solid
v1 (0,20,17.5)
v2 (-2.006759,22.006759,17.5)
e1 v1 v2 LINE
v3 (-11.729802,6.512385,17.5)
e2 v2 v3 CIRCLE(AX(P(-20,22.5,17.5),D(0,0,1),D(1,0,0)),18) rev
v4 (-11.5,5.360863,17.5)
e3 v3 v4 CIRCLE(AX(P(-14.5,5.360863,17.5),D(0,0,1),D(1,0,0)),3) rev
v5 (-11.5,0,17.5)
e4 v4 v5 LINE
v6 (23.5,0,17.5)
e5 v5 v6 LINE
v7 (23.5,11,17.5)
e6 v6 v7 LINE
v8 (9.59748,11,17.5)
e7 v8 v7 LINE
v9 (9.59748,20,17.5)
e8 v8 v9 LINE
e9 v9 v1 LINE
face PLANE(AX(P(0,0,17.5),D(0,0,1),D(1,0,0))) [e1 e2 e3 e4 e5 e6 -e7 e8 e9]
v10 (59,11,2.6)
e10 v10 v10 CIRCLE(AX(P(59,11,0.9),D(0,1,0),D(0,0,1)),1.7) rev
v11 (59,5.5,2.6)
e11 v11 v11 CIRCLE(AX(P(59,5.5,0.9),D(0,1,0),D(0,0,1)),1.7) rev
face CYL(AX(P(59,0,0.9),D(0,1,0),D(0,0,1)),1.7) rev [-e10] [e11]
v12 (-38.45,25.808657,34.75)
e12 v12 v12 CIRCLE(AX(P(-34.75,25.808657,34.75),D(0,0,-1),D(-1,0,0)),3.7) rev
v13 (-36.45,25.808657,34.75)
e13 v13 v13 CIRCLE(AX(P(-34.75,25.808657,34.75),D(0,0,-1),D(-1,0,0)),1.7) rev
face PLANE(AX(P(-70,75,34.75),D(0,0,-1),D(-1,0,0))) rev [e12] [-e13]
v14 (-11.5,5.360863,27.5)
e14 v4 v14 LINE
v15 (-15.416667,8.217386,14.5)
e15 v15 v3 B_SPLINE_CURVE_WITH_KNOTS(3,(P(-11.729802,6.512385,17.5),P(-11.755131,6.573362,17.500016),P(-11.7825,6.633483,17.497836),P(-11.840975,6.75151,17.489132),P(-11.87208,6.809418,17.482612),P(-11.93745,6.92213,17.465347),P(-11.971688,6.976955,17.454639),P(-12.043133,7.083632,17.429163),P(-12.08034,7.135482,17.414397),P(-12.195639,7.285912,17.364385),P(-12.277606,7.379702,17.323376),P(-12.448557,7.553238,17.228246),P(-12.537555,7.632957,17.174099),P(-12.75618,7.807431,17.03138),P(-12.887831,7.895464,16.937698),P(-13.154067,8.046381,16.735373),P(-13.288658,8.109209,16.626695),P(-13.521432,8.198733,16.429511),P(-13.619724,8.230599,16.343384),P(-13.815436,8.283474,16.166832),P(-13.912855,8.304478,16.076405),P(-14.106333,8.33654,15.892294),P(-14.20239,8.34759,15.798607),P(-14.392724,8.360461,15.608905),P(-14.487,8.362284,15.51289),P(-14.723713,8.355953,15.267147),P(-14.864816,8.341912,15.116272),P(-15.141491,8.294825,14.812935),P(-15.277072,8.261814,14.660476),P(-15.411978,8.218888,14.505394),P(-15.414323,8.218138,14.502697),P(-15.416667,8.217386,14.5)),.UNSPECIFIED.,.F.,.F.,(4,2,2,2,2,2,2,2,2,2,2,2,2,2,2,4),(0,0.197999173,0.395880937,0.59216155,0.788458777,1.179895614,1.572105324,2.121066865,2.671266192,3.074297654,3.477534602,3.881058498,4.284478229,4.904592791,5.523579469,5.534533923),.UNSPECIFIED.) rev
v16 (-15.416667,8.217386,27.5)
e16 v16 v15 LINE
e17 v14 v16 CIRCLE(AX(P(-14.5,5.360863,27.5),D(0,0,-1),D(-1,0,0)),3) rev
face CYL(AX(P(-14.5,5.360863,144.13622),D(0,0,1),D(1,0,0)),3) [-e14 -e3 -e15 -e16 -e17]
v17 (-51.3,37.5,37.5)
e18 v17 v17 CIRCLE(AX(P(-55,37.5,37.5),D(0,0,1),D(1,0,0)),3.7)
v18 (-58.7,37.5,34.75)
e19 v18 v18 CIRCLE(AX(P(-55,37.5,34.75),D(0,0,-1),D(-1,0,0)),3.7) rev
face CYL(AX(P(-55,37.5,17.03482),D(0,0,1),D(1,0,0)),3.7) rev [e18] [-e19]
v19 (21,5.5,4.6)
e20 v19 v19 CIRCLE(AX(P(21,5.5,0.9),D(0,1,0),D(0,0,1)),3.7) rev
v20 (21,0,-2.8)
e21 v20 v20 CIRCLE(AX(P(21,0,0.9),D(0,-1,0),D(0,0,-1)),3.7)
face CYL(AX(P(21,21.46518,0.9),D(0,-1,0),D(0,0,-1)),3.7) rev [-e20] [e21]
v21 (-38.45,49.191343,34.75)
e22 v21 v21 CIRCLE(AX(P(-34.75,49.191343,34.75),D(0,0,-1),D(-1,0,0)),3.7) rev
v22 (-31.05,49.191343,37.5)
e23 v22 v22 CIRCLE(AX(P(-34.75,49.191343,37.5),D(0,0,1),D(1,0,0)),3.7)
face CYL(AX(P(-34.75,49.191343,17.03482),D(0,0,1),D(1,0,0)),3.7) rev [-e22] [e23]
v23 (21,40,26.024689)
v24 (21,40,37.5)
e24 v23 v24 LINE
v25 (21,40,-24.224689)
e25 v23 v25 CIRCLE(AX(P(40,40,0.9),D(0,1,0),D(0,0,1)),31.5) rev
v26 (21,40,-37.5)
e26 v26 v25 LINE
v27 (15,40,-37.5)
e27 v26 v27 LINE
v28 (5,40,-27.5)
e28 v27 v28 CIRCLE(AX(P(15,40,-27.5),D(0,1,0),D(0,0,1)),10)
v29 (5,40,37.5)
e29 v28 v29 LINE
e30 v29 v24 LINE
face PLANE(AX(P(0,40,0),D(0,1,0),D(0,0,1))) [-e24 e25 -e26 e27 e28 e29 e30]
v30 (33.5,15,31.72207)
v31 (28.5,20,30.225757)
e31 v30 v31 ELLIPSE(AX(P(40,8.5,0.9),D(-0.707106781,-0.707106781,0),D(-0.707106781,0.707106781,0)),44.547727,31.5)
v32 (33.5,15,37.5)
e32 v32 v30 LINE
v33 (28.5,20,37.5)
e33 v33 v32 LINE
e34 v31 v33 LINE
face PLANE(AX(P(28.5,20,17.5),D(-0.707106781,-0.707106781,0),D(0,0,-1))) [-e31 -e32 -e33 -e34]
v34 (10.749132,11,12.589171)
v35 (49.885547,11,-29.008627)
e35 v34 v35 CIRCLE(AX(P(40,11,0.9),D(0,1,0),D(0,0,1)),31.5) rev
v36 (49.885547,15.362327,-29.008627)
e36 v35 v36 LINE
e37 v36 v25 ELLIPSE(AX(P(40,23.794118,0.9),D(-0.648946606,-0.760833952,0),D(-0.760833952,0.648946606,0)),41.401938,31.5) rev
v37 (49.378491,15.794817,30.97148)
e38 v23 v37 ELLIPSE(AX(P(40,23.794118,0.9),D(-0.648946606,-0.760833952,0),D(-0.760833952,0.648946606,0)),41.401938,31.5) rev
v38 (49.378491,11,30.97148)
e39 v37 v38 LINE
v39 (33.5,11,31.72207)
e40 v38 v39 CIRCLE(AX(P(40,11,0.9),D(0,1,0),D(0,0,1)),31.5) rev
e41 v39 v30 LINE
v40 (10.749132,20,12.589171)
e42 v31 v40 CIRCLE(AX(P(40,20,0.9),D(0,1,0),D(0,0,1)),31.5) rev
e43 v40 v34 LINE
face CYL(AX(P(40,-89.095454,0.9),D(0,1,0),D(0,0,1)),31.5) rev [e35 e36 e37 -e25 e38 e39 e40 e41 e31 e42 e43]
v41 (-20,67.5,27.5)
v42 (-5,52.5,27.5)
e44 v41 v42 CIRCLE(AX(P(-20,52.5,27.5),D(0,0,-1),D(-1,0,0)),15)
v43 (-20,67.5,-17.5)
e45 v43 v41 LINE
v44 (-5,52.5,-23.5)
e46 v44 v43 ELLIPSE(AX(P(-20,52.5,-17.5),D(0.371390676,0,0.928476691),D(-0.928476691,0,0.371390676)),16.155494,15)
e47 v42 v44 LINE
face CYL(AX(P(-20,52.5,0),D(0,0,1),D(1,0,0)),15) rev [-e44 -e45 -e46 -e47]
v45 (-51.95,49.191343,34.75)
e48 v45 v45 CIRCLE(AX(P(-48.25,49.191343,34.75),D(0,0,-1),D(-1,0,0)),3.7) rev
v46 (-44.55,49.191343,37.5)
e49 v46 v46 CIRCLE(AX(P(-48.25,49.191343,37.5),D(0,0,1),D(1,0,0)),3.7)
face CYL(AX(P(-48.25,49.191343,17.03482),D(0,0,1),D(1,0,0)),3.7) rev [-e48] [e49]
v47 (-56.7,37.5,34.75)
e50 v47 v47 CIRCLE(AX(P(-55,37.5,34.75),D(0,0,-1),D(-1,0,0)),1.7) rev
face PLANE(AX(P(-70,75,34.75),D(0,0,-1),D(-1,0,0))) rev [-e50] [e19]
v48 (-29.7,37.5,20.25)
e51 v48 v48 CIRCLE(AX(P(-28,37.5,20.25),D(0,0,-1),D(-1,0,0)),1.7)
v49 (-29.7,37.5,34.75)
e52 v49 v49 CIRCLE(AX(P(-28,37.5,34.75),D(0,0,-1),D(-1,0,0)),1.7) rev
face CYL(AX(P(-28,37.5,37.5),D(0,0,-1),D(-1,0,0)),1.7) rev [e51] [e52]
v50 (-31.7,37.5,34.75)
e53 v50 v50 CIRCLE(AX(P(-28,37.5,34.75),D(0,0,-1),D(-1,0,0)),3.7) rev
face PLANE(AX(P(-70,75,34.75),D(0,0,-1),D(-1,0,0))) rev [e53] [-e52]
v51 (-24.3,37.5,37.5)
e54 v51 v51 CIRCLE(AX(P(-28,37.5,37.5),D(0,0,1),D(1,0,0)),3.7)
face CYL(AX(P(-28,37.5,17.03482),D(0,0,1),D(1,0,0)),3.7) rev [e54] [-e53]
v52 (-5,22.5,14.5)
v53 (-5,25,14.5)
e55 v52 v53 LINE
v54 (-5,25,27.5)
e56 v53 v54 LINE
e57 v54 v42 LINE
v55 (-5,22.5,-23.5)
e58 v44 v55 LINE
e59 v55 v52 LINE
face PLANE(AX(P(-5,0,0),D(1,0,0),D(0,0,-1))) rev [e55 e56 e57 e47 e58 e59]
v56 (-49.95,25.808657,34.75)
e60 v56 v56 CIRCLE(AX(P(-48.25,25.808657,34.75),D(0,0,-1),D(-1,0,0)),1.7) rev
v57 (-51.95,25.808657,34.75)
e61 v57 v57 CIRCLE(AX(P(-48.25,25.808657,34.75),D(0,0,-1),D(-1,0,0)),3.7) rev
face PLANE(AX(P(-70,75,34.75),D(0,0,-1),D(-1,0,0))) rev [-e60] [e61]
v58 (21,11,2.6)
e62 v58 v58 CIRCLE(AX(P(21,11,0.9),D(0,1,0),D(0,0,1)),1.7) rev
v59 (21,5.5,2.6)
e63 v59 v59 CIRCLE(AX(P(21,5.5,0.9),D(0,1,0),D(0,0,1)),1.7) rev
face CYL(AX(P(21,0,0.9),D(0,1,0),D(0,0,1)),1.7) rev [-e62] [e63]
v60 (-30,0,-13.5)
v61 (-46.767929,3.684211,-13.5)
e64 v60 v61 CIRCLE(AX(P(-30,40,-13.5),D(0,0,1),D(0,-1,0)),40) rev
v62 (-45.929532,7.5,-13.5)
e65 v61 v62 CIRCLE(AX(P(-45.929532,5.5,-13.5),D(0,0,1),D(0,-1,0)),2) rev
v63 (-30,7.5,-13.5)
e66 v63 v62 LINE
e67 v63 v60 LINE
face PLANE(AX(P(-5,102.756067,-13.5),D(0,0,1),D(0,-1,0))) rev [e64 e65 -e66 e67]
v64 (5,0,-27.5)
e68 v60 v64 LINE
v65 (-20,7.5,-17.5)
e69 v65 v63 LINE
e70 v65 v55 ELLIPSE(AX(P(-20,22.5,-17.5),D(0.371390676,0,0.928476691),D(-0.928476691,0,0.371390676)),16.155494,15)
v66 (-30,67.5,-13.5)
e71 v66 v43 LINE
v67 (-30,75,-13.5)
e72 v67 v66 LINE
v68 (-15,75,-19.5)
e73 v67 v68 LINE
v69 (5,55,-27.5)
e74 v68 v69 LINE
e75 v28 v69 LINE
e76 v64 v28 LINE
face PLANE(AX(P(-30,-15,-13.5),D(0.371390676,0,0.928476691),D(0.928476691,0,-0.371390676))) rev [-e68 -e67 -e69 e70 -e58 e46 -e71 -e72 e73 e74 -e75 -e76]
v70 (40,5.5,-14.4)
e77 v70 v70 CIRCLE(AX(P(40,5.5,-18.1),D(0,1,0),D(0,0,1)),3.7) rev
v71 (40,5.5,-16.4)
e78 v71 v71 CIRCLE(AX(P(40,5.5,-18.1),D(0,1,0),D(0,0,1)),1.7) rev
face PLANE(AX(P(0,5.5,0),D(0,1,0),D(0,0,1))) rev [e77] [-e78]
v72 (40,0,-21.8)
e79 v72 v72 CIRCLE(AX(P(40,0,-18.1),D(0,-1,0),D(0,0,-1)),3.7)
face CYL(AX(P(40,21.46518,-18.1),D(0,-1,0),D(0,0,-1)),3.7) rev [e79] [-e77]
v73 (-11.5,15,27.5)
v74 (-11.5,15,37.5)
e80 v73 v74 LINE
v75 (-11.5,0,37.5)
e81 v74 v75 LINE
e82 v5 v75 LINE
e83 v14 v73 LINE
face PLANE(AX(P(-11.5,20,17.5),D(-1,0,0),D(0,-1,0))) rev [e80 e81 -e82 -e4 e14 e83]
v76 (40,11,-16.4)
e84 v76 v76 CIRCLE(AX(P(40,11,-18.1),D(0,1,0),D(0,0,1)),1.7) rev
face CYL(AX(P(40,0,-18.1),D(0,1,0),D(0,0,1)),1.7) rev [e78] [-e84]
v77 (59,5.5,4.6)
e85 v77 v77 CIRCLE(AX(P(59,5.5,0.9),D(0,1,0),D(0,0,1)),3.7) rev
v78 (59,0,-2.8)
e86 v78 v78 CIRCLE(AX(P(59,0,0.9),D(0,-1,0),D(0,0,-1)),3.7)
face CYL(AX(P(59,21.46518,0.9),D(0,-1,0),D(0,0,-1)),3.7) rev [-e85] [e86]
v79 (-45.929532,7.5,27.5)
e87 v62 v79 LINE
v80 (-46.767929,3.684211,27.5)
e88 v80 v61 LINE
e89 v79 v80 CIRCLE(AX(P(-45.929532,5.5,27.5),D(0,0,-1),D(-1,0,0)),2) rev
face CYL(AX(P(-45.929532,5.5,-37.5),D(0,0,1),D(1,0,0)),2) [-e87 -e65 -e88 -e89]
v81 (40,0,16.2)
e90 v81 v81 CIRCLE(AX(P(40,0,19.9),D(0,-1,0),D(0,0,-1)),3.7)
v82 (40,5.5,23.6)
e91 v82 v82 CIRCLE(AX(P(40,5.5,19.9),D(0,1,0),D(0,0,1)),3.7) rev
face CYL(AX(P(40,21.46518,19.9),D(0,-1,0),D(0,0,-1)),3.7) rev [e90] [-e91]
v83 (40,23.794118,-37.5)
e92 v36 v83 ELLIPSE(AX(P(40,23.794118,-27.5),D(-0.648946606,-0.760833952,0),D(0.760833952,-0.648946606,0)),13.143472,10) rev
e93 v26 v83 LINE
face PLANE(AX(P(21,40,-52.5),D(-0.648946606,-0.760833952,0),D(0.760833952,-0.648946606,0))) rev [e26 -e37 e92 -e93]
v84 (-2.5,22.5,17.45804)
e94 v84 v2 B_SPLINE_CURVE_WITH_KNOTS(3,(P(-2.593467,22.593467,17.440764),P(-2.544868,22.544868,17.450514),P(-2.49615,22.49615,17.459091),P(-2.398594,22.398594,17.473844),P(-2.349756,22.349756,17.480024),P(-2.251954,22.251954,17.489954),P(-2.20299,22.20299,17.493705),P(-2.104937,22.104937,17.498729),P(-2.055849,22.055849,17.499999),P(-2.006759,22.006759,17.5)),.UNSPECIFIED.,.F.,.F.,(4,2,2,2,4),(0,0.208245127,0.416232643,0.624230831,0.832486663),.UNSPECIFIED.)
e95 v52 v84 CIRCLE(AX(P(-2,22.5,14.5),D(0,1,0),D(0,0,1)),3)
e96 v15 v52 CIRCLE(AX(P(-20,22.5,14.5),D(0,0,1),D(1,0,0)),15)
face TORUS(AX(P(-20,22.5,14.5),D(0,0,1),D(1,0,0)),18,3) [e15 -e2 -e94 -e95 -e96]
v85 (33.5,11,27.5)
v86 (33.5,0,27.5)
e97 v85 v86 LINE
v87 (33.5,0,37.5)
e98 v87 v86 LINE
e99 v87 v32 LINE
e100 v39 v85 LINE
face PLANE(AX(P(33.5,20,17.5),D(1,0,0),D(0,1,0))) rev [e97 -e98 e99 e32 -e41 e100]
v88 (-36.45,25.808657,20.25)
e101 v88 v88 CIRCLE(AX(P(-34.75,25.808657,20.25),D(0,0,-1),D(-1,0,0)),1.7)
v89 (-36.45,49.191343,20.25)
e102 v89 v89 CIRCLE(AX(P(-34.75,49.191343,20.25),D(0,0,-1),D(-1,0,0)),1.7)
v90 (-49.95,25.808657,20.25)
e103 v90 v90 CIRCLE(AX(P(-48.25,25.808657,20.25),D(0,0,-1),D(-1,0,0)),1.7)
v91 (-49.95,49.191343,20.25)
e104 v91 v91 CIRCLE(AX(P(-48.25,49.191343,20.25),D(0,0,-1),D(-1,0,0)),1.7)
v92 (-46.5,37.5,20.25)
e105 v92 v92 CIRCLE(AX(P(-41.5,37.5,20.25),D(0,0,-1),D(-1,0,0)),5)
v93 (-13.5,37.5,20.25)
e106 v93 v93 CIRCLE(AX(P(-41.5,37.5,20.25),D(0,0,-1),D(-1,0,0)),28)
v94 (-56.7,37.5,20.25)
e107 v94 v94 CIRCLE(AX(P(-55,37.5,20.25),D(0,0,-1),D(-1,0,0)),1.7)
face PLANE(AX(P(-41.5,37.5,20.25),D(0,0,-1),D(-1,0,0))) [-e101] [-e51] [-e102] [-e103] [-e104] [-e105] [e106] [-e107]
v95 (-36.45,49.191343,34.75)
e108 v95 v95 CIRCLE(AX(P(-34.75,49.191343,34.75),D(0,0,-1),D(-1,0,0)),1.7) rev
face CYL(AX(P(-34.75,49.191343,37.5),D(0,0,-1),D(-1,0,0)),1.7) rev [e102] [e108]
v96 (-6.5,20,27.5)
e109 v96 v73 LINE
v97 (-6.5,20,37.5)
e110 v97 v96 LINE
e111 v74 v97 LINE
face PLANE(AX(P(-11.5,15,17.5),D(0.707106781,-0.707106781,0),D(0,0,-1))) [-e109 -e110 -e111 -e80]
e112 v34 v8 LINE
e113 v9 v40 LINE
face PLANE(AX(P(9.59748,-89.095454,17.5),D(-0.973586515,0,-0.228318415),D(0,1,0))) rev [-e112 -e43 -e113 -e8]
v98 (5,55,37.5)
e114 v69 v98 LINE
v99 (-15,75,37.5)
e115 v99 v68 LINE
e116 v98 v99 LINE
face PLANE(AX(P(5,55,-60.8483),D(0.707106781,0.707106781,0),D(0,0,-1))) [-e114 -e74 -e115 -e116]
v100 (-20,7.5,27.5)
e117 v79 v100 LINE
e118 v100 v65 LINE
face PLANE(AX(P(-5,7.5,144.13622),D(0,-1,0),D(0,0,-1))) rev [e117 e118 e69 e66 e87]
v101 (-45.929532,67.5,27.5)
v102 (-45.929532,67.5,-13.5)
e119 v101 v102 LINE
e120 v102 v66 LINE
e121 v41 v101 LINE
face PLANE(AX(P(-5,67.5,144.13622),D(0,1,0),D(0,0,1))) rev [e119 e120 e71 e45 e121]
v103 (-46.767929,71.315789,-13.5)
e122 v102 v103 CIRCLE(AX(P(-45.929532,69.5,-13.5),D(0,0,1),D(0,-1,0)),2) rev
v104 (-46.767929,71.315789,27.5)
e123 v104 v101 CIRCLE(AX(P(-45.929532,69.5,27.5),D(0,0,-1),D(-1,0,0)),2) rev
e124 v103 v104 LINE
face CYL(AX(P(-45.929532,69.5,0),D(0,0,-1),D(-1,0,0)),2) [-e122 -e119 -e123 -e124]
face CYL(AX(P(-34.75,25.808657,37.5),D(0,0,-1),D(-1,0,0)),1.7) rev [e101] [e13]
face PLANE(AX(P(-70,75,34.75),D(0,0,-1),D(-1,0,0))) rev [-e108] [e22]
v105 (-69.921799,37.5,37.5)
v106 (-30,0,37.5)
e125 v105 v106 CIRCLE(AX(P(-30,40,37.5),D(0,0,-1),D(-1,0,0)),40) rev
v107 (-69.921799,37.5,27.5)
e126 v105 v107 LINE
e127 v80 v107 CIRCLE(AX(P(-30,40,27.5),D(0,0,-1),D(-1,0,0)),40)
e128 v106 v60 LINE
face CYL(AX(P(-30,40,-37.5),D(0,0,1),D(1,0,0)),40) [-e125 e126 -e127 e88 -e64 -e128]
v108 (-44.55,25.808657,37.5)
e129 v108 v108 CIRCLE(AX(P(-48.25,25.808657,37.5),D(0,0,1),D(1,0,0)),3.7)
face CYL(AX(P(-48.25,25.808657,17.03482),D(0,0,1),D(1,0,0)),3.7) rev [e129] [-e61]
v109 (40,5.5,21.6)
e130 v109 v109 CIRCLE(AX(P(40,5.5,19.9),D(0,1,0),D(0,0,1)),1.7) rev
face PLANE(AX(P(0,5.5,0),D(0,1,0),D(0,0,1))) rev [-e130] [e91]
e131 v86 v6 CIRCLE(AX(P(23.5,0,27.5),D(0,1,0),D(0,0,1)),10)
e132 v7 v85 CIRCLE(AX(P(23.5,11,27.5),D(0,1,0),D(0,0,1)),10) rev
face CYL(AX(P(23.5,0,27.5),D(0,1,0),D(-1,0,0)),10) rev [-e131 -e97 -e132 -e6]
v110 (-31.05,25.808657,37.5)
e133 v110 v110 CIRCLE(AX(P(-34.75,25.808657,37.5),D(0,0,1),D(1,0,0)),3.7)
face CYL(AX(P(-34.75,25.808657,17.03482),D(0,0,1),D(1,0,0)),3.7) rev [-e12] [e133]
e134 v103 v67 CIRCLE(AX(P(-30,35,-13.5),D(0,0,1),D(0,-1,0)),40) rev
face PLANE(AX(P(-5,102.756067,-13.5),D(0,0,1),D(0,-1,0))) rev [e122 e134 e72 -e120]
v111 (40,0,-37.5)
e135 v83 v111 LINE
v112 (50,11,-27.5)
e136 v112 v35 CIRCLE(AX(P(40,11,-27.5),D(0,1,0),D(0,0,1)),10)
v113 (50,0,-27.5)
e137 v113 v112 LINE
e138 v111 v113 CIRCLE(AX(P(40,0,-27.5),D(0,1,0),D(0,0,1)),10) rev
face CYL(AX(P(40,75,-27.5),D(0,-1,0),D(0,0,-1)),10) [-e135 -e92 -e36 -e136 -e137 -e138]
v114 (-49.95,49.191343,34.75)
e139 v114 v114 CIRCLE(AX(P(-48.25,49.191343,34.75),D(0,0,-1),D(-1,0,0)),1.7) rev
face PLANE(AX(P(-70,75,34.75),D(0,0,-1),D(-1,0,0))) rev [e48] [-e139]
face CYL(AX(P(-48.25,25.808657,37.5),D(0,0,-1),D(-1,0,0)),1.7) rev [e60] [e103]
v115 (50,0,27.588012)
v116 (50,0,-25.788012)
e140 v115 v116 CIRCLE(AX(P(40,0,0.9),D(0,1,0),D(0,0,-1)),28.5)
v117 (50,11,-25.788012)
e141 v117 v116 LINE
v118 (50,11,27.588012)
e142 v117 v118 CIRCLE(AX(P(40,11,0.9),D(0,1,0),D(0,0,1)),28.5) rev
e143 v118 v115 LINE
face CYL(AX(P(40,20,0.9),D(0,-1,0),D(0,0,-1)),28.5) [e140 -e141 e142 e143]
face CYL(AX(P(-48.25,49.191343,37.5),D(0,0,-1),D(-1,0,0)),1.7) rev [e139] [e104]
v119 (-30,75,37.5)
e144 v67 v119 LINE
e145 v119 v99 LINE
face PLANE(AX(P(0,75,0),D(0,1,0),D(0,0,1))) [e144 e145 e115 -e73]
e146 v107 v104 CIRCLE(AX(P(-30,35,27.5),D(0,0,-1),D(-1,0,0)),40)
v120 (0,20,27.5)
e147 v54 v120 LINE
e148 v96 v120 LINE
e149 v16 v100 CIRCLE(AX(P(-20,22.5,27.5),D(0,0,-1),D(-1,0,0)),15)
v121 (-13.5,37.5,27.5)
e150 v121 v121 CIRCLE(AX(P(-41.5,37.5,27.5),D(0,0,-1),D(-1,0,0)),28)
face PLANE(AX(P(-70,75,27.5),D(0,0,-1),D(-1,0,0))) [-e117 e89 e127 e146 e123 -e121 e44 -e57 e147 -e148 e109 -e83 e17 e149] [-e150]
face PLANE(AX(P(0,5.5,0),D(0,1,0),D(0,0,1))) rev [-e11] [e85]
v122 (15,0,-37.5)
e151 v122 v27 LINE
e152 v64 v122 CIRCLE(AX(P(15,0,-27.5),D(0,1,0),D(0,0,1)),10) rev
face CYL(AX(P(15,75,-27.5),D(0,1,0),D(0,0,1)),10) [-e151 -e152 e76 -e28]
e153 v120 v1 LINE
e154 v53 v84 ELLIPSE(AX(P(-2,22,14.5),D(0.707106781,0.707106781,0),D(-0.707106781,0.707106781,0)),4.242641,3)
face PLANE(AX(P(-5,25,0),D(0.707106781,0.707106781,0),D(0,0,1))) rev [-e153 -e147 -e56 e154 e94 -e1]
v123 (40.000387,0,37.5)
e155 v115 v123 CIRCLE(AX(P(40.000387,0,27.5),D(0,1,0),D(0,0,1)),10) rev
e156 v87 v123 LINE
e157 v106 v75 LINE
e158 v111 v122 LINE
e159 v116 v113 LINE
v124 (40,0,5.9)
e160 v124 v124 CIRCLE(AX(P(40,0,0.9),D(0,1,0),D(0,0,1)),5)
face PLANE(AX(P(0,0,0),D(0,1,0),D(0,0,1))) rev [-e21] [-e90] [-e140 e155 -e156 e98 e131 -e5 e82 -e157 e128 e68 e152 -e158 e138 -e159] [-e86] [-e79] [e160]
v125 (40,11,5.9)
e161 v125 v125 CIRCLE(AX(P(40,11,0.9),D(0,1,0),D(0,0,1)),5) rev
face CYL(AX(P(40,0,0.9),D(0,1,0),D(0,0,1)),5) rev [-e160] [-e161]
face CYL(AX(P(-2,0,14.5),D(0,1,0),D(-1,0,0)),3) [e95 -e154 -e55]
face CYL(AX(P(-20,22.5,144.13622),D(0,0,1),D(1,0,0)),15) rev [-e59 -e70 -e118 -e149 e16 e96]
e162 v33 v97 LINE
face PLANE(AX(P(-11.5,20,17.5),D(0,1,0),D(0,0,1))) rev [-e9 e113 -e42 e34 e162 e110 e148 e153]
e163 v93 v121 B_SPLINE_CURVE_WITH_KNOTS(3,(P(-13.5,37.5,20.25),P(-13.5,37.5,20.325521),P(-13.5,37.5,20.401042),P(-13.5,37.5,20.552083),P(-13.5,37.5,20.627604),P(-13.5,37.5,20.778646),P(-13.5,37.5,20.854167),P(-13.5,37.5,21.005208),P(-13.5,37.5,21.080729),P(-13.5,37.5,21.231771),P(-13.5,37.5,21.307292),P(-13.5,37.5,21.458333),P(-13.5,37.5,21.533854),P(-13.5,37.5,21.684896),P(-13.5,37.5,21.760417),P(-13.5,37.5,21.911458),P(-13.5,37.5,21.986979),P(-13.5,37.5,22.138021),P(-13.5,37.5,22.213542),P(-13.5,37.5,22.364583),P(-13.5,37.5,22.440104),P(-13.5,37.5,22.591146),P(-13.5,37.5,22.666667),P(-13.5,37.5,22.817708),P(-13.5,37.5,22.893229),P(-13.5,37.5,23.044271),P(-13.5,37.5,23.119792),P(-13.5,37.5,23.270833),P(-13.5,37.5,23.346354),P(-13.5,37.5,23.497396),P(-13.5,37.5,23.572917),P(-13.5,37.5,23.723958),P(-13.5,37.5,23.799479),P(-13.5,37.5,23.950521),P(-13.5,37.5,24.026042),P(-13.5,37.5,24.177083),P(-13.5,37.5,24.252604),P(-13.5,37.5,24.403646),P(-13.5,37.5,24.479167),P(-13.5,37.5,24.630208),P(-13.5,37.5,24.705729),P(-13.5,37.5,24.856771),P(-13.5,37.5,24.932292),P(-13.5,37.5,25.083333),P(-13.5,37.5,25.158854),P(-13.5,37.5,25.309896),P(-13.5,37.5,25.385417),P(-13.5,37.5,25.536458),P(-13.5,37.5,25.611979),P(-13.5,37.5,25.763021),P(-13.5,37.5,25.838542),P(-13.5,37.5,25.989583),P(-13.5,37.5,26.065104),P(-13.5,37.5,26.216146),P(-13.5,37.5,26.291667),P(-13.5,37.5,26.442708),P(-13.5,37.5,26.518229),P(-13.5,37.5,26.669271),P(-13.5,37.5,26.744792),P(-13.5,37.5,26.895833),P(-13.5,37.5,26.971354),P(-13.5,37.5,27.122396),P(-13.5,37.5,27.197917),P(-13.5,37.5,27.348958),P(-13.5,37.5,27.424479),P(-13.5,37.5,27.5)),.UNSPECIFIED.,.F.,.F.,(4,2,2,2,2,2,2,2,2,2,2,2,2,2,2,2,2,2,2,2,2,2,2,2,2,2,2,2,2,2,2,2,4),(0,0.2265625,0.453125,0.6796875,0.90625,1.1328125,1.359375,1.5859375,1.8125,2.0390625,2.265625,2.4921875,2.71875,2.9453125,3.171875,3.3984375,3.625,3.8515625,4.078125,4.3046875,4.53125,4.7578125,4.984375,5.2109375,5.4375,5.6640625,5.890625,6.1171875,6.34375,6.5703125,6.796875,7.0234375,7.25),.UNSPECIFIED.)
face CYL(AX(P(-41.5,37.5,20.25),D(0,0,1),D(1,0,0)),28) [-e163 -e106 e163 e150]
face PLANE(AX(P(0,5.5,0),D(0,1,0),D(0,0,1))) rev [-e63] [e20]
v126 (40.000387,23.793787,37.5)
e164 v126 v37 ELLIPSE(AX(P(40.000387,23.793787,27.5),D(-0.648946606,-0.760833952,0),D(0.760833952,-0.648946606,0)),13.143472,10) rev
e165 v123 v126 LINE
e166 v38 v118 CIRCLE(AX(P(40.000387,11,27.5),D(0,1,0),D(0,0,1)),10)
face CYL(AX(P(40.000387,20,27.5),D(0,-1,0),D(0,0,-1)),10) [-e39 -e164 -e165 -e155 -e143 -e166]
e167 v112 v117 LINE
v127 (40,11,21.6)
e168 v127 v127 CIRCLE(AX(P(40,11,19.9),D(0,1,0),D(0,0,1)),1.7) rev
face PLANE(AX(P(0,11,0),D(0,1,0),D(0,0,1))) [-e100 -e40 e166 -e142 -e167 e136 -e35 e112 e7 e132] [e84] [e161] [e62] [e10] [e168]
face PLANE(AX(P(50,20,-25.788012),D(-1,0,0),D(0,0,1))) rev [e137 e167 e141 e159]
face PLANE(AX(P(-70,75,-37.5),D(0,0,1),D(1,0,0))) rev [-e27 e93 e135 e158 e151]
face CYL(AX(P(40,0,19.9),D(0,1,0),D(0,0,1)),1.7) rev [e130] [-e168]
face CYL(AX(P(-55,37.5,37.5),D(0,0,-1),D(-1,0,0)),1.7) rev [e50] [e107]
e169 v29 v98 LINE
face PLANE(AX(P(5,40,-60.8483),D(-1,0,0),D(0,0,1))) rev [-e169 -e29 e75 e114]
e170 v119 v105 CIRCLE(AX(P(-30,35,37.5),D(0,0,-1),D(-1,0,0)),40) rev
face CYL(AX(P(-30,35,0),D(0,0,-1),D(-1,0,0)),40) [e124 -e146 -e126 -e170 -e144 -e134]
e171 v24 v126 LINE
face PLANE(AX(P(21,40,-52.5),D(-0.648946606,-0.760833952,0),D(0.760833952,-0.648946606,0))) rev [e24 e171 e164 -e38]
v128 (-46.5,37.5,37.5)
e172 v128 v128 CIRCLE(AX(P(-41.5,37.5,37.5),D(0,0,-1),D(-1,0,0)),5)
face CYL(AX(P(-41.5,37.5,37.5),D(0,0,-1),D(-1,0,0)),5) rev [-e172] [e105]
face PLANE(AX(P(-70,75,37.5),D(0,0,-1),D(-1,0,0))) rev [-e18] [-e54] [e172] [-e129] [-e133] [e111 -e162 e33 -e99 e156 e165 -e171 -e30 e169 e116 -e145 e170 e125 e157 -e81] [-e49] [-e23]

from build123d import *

# Parameters (mm, degrees)
SKETCH_1_W           = 140
SKETCH_1_H           = 75
EXTRUDE_1_DEPTH      = 75
SKETCH_2_R           = 5
SKETCH_2_R_2         = 1.7
CUT_EXTRUDE_3_DEPTH  = 75
SKETCH_3_R           = 30
CUT_EXTRUDE_4_DEPTH  = 65
SKETCH_5_W           = 86.110755756
SKETCH_5_H           = 127.816531237
CUT_EXTRUDE_5_DEPTH  = 65
SKETCH_6_R           = 5
SKETCH_6_R_2         = 1.7
CUT_EXTRUDE_6_DEPTH  = 110.230261375
SKETCH_7_R           = 31.5
CUT_EXTRUDE_8_DEPTH  = 64
SKETCH_8_W           = 81.607165619
SKETCH_8_H           = 101.959181743
CUT_EXTRUDE_9_DEPTH  = 35
SKETCH_9_W           = 88.154882568
SKETCH_9_H           = 60
CUT_EXTRUDE_10_DEPTH = 41
SKETCH_10_W          = 45
SKETCH_10_H          = 50
CUT_EXTRUDE_11_DEPTH = 20
FILLET_2_R           = 10
SKETCH_12_W          = 15
SKETCH_12_H          = 75
CUT_EXTRUDE_13_DEPTH = 29
CUT_EXTRUDE_14_DEPTH = 90
CUT_EXTRUDE_15_DEPTH = 20
CHAMFER_1_SIZE       = 5
CHAMFER_2_SIZE       = 5
CHAMFER_3_SIZE       = 3.631453243
CHAMFER_4_SIZE       = 25
CUT_EXTRUDE_16_DEPTH = 90
FILLET_4_R           = 40
FILLET_9_R           = 10
CUT_EXTRUDE_17_DEPTH = 90
FILLET_10_R          = 10
FILLET_11_R          = 2
FILLET_12_R          = 15
CHAMFER_5_SIZE       = 20
FILLET_13_R          = 3
SKETCH_20_R          = 3.7
CUT_EXTRUDE_18_DEPTH = 2.75
SKETCH_21_R          = 3.7
CUT_EXTRUDE_19_DEPTH = 5.5
EXTRUDE_START        = 7.25
SKETCH_22_R          = 28
SKETCH_22_R_2        = 5
SKETCH_22_R_3        = 1.7
EXTRUDE_2_DEPTH      = 7.25


# Some blends are built 0.0001 mm under size
with BuildPart() as part:
    # 草图1 → 凸台-拉伸1 (new body)
    with BuildSketch(Plane(origin=(0, 0, 0), x_dir=(1, 0, 0), z_dir=(0, 1, 0))):
        Rectangle(SKETCH_1_W, SKETCH_1_H)
    extrude(amount=EXTRUDE_1_DEPTH)

    # 草图2 → 切除-拉伸3 (cut)
    with BuildSketch(Plane(origin=(0, 0, -37.5), x_dir=(-1, 0, 0), z_dir=(0, 0, -1))):
        with Locations((41.5, 37.5)):
            Circle(SKETCH_2_R)
        with Locations((55, 37.5)):
            Circle(SKETCH_2_R_2)
        with Locations((48.25, 25.808657049)):
            Circle(SKETCH_2_R_2)
        with Locations((34.75, 25.808657049)):
            Circle(SKETCH_2_R_2)
        with Locations((28, 37.5)):
            Circle(SKETCH_2_R_2)
        with Locations((34.75, 49.191342951)):
            Circle(SKETCH_2_R_2)
        with Locations((48.25, 49.191342951)):
            Circle(SKETCH_2_R_2)
    extrude(amount=-CUT_EXTRUDE_3_DEPTH, mode=Mode.SUBTRACT)

    # 草图3 → 切除-拉伸4 (cut)
    with BuildSketch(Plane(origin=(0, 0, -37.5), x_dir=(-1, 0, 0), z_dir=(0, 0, -1))):
        with Locations((41.5, 37.5)):
            Circle(SKETCH_3_R)
    extrude(amount=-CUT_EXTRUDE_4_DEPTH, mode=Mode.SUBTRACT)

    # 草图5 → 切除-拉伸5 (cut)
    with BuildSketch(Plane.ZY.offset(70)):
        with Locations((-56.555377878, 38.847801736)):
            Rectangle(SKETCH_5_W, SKETCH_5_H)
    extrude(amount=-CUT_EXTRUDE_5_DEPTH, mode=Mode.SUBTRACT)

    # 草图6 → 切除-拉伸6 (cut, through all)
    with BuildSketch(Plane(origin=(0, 75, 0), x_dir=(1, 0, 0), z_dir=(0, 1, 0))):
        with Locations(Location((40, -0.9, 0), (0, 0, 270))):
            Circle(SKETCH_6_R)
        with Locations(Location((59, -0.9, 0), (0, 0, 270))):
            Circle(SKETCH_6_R_2)
        with Locations(Location((40, -19.9, 0), (0, 0, 270))):
            Circle(SKETCH_6_R_2)
        with Locations(Location((21, -0.9, 0), (0, 0, 270))):
            Circle(SKETCH_6_R_2)
        with Locations(Location((40, 18.1, 0), (0, 0, 270))):
            Circle(SKETCH_6_R_2)
    extrude(amount=-CUT_EXTRUDE_6_DEPTH, mode=Mode.SUBTRACT)

    # 草图7 → 切除-拉伸8 (cut)
    with BuildSketch(Plane(origin=(0, 75, 0), x_dir=(1, 0, 0), z_dir=(0, 1, 0))):
        with Locations((40, -0.9)):
            Circle(SKETCH_7_R)
    extrude(amount=-CUT_EXTRUDE_8_DEPTH, mode=Mode.SUBTRACT)

    # 草图8 → 切除-拉伸9 (cut)
    with BuildSketch(Plane(origin=(0, 75, 0), x_dir=(1, 0, 0), z_dir=(0, 1, 0))):
        with Locations((45.803582809, 9.868709537)):
            Rectangle(SKETCH_8_W, SKETCH_8_H)
    extrude(amount=-CUT_EXTRUDE_9_DEPTH, mode=Mode.SUBTRACT)

    # 草图9 → 切除-拉伸10 (cut)
    with BuildSketch(Plane(origin=(0, 0, -13.5), x_dir=(-1, 0, 0), z_dir=(0, 0, -1))):
        with Locations((49.077441284, 37.5)):
            Rectangle(SKETCH_9_W, SKETCH_9_H)
    extrude(amount=-CUT_EXTRUDE_10_DEPTH, mode=Mode.SUBTRACT)

    # 草图10 → 切除-拉伸11 (cut)
    with BuildSketch(Plane.XY.offset(37.5)):
        with Locations((11, -5)):
            Rectangle(SKETCH_10_W, SKETCH_10_H)
    extrude(amount=-CUT_EXTRUDE_11_DEPTH, mode=Mode.SUBTRACT)

    # 圆角2
    fillet_2_edges = [part.edges().sort_by_distance(p)[0] for p in [
        (33.5, 5.5, 17.5),
    ]]
    fillet(fillet_2_edges, radius=FILLET_2_R)

    # 草图12 → 切除-拉伸13 (cut)
    with BuildSketch(Plane(origin=(0, 40, 0), x_dir=(1, 0, 0), z_dir=(0, 1, 0))):
        with Locations((62.5, 0)):
            Rectangle(SKETCH_12_W, SKETCH_12_H)
    extrude(amount=-CUT_EXTRUDE_13_DEPTH, mode=Mode.SUBTRACT)

    # 草图13 → 切除-拉伸14 (cut)
    with BuildSketch(Plane.XY.offset(37.5)):
        Polygon((21, 40), (55, 11), (55, 40), align=None)
    extrude(amount=-CUT_EXTRUDE_14_DEPTH, mode=Mode.SUBTRACT)

    # 草图14 → 切除-拉伸15 (cut)
    with BuildSketch(Plane.XZ):
        with BuildLine():
            Line((50, -25.78801229), (50, -49.043195076))
            Line((50, -49.043195076), (107.000534674, -49.043195076))
            Line((107.000534674, -49.043195076), (107.000534674, 45.470511991))
            Line((107.000534674, 45.470511991), (50, 45.470511991))
            Line((50, 45.470511991), (50, 27.58801229))
            ThreePointArc((50, 27.58801229), (68.5, 0.9), (50, -25.78801229))
        make_face()
    extrude(amount=-CUT_EXTRUDE_15_DEPTH, mode=Mode.SUBTRACT)

    # 倒角1
    chamfer_1_edges = [part.edges().sort_by_distance(p)[0] for p in [
        (-11.5, 20, 32.5),
        (33.5, 20, 34.611035007),
    ]]
    chamfer(chamfer_1_edges, length=CHAMFER_1_SIZE)

    # 倒角2
    chamfer_2_edges = [part.edges().sort_by_distance(p)[0] for p in [
        (-5, 20, 22.5),
    ]]
    chamfer(chamfer_2_edges, length=CHAMFER_2_SIZE)

    # 倒角3
    # the kernel refuses this chamfer: 5, 3.631453243 mm, written as the material it takes off along each edge
    with BuildSketch(Plane(origin=(13.228933529, 11, 17.5), x_dir=(-0.4507563772017135, 0, -0.8926470122125466), z_dir=(0, 1, 0))) as chamfer_3_piece_1:
        with BuildLine():
            Line((5.501422933, 0), (CHAMFER_3_SIZE * 0.450756377234, CHAMFER_3_SIZE * 0.892647012276))
            Line((CHAMFER_3_SIZE * 0.450756377234, CHAMFER_3_SIZE * 0.892647012276), (0, 0))
            ThreePointArc((0, 0), (2.827778177, 0.120237365), (5.501422933, 0))
        make_face()
    extrude(amount=9, mode=Mode.SUBTRACT)

    # 倒角4
    # the kernel refuses this chamfer: 25 mm, written as the material it adds along each edge
    with BuildSketch(Plane(origin=(-5, 0, -13.5), x_dir=(0, 0, -1), z_dir=(0, 1, 0))) as chamfer_4_piece_1_section:
        Polygon((CHAMFER_4_SIZE, 0), (0, CHAMFER_4_SIZE), (0, 0), align=None)
    chamfer_4_piece_1 = extrude(amount=7.5, mode=Mode.PRIVATE)
    chamfer_4_piece_1 = split(chamfer_4_piece_1, bisect_by=Plane(origin=(-5, 0, -37.5), z_dir=(0, 0, 1)), keep=Keep.TOP, mode=Mode.PRIVATE)
    add(chamfer_4_piece_1)
    with BuildSketch(Plane(origin=(-5, 0, -13.5), x_dir=(0, 0, -1), z_dir=(0, 1, 0))) as chamfer_4_piece_2_section:
        Polygon((CHAMFER_4_SIZE, 0), (0, CHAMFER_4_SIZE), (0, 0), align=None)
    chamfer_4_piece_2 = extrude(amount=71.792074699, mode=Mode.PRIVATE)
    chamfer_4_piece_2 = split(chamfer_4_piece_2, bisect_by=Plane(origin=(-5, 0, -37.5), z_dir=(0, 0, 1)), keep=Keep.TOP, mode=Mode.PRIVATE)
    chamfer_4_piece_2 = split(chamfer_4_piece_2, bisect_by=Plane(origin=(-5, 67.5, -13.5), z_dir=(0, 1, 0)), keep=Keep.TOP, mode=Mode.PRIVATE)
    add(chamfer_4_piece_2)
    with BuildSketch(Plane(origin=(-5, 3.207925301, -13.5), x_dir=(0, 0, -1), z_dir=(0, 1, 0))) as chamfer_4_piece_3_section:
        Polygon((CHAMFER_4_SIZE, 0), (0, CHAMFER_4_SIZE), (0, 0), align=None)
    chamfer_4_piece_3 = extrude(amount=71.792074699, mode=Mode.PRIVATE)
    chamfer_4_piece_3 = split(chamfer_4_piece_3, bisect_by=Plane(origin=(-5, 3.207925301, -37.5), z_dir=(0, 0, 1)), keep=Keep.TOP, mode=Mode.PRIVATE)
    chamfer_4_piece_3 = split(chamfer_4_piece_3, bisect_by=Plane(origin=(-5, 7.5, -13.5), z_dir=(0, -1, 0)), keep=Keep.TOP, mode=Mode.PRIVATE)
    add(chamfer_4_piece_3)
    with BuildSketch(Plane(origin=(-5, 67.5, -13.5), x_dir=(0, 0, -1), z_dir=(0, 1, 0))) as chamfer_4_piece_4_section:
        Polygon((CHAMFER_4_SIZE, 0), (0, CHAMFER_4_SIZE), (0, 0), align=None)
    chamfer_4_piece_4 = extrude(amount=7.5, mode=Mode.PRIVATE)
    chamfer_4_piece_4 = split(chamfer_4_piece_4, bisect_by=Plane(origin=(-5, 67.5, -37.5), z_dir=(0, 0, 1)), keep=Keep.TOP, mode=Mode.PRIVATE)
    add(chamfer_4_piece_4)

    # 草图18 → 切除-拉伸16 (cut)
    with BuildSketch(Plane(origin=(0, 75, 0), x_dir=(1, 0, 0), z_dir=(0, 1, 0))):
        Polygon((5, 37.5), (-30, 13.5), (-17.082794304, 37.696917135), align=None)
    extrude(amount=-CUT_EXTRUDE_16_DEPTH, mode=Mode.SUBTRACT)

    # 圆角4
    # the kernel refuses this fillet: 40 mm, written as the material it takes off along each edge
    with BuildSketch(Plane(origin=(-70, 0, 137.5), x_dir=(0, 1, 0), z_dir=(0, 0, -1)), Plane(origin=(-70, 75, 137.5), x_dir=(1, 0, 0), z_dir=(0, 0, -1))) as fillet_4_piece_1:
        with BuildLine():
            CenterArc((FILLET_4_R, FILLET_4_R), FILLET_4_R, 180, 90)
            Line((0, FILLET_4_R), (0, 0))
            Line((0, 0), (FILLET_4_R, 0))
        make_face()
    extrude(amount=251, mode=Mode.SUBTRACT)

    # 圆角9
    # the kernel refuses this fillet: 10 mm, written as the material it takes off along each edge
    with BuildSketch(Plane(origin=(50, -25, -37.5), x_dir=(-1, 0, 0), z_dir=(0, 1, 0))) as fillet_9_piece_1:
        with BuildLine():
            CenterArc((FILLET_9_R, FILLET_9_R), FILLET_9_R, 180, 90)
            Line((0, FILLET_9_R), (0, 0))
            Line((0, 0), (FILLET_9_R, 0))
        make_face()
    extrude(amount=65.264705882, mode=Mode.SUBTRACT)
    with BuildSketch(Plane(origin=(50, 40.264705882, 37.5), x_dir=(-1, 0, 0), z_dir=(0, -1, 0))) as fillet_9_piece_2_section:
        with BuildLine():
            CenterArc((FILLET_9_R, FILLET_9_R), FILLET_9_R, 180, 90)
            Line((0, FILLET_9_R), (0, 0))
            Line((0, 0), (FILLET_9_R, 0))
        make_face()
    fillet_9_piece_2 = extrude(amount=65.264705882, mode=Mode.PRIVATE)
    fillet_9_piece_2 = fillet_9_piece_2 - Plane(origin=(40, 40.264705882, 0.9), x_dir=(0.35087719298245684, 0, 0.9364214838654397), z_dir=(0, -1, 0)) * Cylinder(28.5, 171, mode=Mode.PRIVATE)
    add(fillet_9_piece_2, mode=Mode.SUBTRACT)

    # 草图19 → 切除-拉伸17 (cut)
    with BuildSketch(Plane(origin=(0, 75, 0), x_dir=(1, 0, 0), z_dir=(0, 1, 0))):
        Polygon((-30, 13.5), (5, 27.5), (5, 42.665451474), align=None)
    extrude(amount=-CUT_EXTRUDE_17_DEPTH, mode=Mode.SUBTRACT)

    # 圆角10
    fillet_10_edges = [part.edges().sort_by_distance(p)[0] for p in [
        (5, 20, -37.5),
    ]]
    fillet(fillet_10_edges, radius=FILLET_10_R - 0.0001)  # a hair under: the kernel refuses the full size

    # 圆角11
    fillet_11_edges = [part.edges().sort_by_distance(p)[0] for p in [
        (-53.318447633, 7.5, 7),
        (-53.318447633, 67.5, 7),
    ]]
    fillet(fillet_11_edges, radius=FILLET_11_R)

    # 圆角12
    fillet_12_edges = [part.edges().sort_by_distance(p)[0] for p in [
        (-5, 7.5, -3),
        (-5, 67.5, 2),
    ]]
    fillet(fillet_12_edges, radius=FILLET_12_R)

    # 倒角5
    chamfer_5_edges = [part.edges().sort_by_distance(p)[0] for p in [
        (5, 75, 5),
    ]]
    chamfer(chamfer_5_edges, length=CHAMFER_5_SIZE)

    # 圆角13
    # the kernel refuses this fillet: 3 mm, written as the material it takes off along each edge
    with BuildSketch(Plane(origin=(-5, 32.5, 17.5), x_dir=(0, 0, -1), z_dir=(0, -1, 0))) as fillet_13_piece_1_section:
        with BuildLine():
            CenterArc((FILLET_13_R, FILLET_13_R), FILLET_13_R, 180, 90)
            Line((0, FILLET_13_R), (0, 0))
            Line((0, 0), (FILLET_13_R, 0))
        make_face()
    fillet_13_piece_1 = extrude(amount=10, mode=Mode.PRIVATE)
    fillet_13_piece_1 = split(fillet_13_piece_1, bisect_by=Plane(origin=(-8.75, 28.75, 17.5), z_dir=(-0.7071067811865476, -0.7071067811865476, 0)), keep=Keep.TOP, mode=Mode.PRIVATE)
    add(fillet_13_piece_1, mode=Mode.SUBTRACT)
    with BuildSketch(Plane(origin=(-20, 22.5, 17.5), x_dir=(1, 0, 0), z_dir=(0, 1, 0))) as fillet_13_piece_2_section:
        with BuildLine():
            CenterArc((15 + FILLET_13_R, FILLET_13_R), FILLET_13_R, 180, 90)
            Line((15 + FILLET_13_R, 0), (15, 0))
            Line((15, 0), (15, FILLET_13_R))
        make_face()
    fillet_13_piece_2 = revolve(axis=Axis((-20, 22.5, 17.5), (0, 0, -1)), revolution_arc=84.134154569, mode=Mode.PRIVATE)
    fillet_13_piece_2 = split(fillet_13_piece_2, bisect_by=Plane(origin=(-11.5, 22.5, 17.5), z_dir=(1, 0, 0)), keep=Keep.TOP, mode=Mode.PRIVATE)
    fillet_13_piece_2 = split(fillet_13_piece_2, bisect_by=Plane(origin=(-11.25, 31.25, 17.5), z_dir=(-0.7071067811865476, -0.7071067811865476, 0)), keep=Keep.TOP, mode=Mode.PRIVATE)
    add(fillet_13_piece_2, mode=Mode.SUBTRACT)
    with BuildSketch(Plane(origin=(-11.5, 10.140792906, 17.5), x_dir=(-0.8976060108994353, -0.44079864926880474, 0), z_dir=(0, 0, 1))) as fillet_13_piece_3:
        with BuildLine():
            CenterArc((4.799804459, 2.968097419), FILLET_13_R, 153.845150793, 107.791590573)
            Line((2.106986426, 4.290493367), (0, 0))
            ThreePointArc((0, 0), (2.181729299, 0.159512903), (4.363458599, 0))
        make_face()
    extrude(amount=10, mode=Mode.SUBTRACT)
    with BuildSketch(Plane(origin=(-20, 22.5, 17.5), x_dir=(1, 0, 0), z_dir=(0, 1, 0))) as fillet_13_piece_4a_section:
        with BuildLine():
            CenterArc((15 + FILLET_13_R, FILLET_13_R), FILLET_13_R, 180, 90)
            Line((15 + FILLET_13_R, 0), (15, 0))
            Line((15, 0), (15, FILLET_13_R))
        make_face()
    fillet_13_piece_4a = revolve(axis=Axis((-20, 22.5, 17.5), (0, 0, -1)), revolution_arc=84.134154569, mode=Mode.PRIVATE)
    fillet_13_piece_4a = split(fillet_13_piece_4a, bisect_by=Plane(origin=(-11.5, 22.5, 17.5), z_dir=(-1, 0, 0)), keep=Keep.TOP, mode=Mode.PRIVATE)
    with BuildSketch(Plane(origin=(-11.5, 10.140792906, 5.550176483), x_dir=(-0.8976060108994353, -0.44079864926880474, 0), z_dir=(0, 0, 1))) as fillet_13_piece_4b_section:
        with BuildLine():
            CenterArc((4.799804459, 2.968097419), FILLET_13_R, 153.845150793, 107.791590573)
            Line((2.106986426, 4.290493367), (0, 0))
            ThreePointArc((0, 0), (2.181729299, 0.159512903), (4.363458599, 0))
        make_face()
    fillet_13_piece_4b = extrude(amount=21.949823517, mode=Mode.PRIVATE)
    fillet_13_piece_4b = split(fillet_13_piece_4b, bisect_by=Plane(origin=(-11.5, 10.140792906, 17.5), z_dir=(0, 0, -1)), keep=Keep.TOP, mode=Mode.PRIVATE)
    fillet_13_piece_4 = fillet_13_piece_4a & fillet_13_piece_4b
    add(fillet_13_piece_4, mode=Mode.SUBTRACT)

    # 草图20 → 切除-拉伸18 (cut)
    with BuildSketch(Plane.XY.offset(37.5)):
        with Locations((-34.75, 49.191342951)):
            Circle(SKETCH_20_R)
        with Locations((-48.25, 49.191342951)):
            Circle(SKETCH_20_R)
        with Locations((-55, 37.5)):
            Circle(SKETCH_20_R)
        with Locations((-48.25, 25.808657049)):
            Circle(SKETCH_20_R)
        with Locations((-34.75, 25.808657049)):
            Circle(SKETCH_20_R)
        with Locations((-28, 37.5)):
            Circle(SKETCH_20_R)
    extrude(amount=-CUT_EXTRUDE_18_DEPTH, mode=Mode.SUBTRACT)

    # 草图21 → 切除-拉伸19 (cut)
    with BuildSketch(Plane.XZ):
        with Locations(Location((40, -18.1, 0), (0, 0, 270))):
            Circle(SKETCH_21_R)
        with Locations(Location((21, 0.9, 0), (0, 0, 270))):
            Circle(SKETCH_21_R)
        with Locations(Location((40, 19.9, 0), (0, 0, 270))):
            Circle(SKETCH_21_R)
        with Locations(Location((59, 0.9, 0), (0, 0, 270))):
            Circle(SKETCH_21_R)
    extrude(amount=-CUT_EXTRUDE_19_DEPTH, mode=Mode.SUBTRACT)

    # 草图22 → 凸台-拉伸2 (add)
    with BuildSketch(Plane(origin=(0, 0, 27.5), x_dir=(-1, 0, 0), z_dir=(0, 0, -1)).offset(EXTRUDE_START)):
        with Locations(Location((41.5, 37.5, 0), (0, 0, 180))):
            Circle(SKETCH_22_R)
        with Locations((41.5, 37.5)):
            Circle(SKETCH_22_R_2, mode=Mode.SUBTRACT)
        with Locations((48.25, 49.191342951)):
            Circle(SKETCH_22_R_3, mode=Mode.SUBTRACT)
        with Locations((34.75, 49.191342951)):
            Circle(SKETCH_22_R_3, mode=Mode.SUBTRACT)
        with Locations((28, 37.5)):
            Circle(SKETCH_22_R_3, mode=Mode.SUBTRACT)
        with Locations((34.75, 25.808657049)):
            Circle(SKETCH_22_R_3, mode=Mode.SUBTRACT)
        with Locations((48.25, 25.808657049)):
            Circle(SKETCH_22_R_3, mode=Mode.SUBTRACT)
        with Locations((55, 37.5)):
            Circle(SKETCH_22_R_3, mode=Mode.SUBTRACT)
    extrude(amount=-EXTRUDE_2_DEPTH)


solid = part.part
